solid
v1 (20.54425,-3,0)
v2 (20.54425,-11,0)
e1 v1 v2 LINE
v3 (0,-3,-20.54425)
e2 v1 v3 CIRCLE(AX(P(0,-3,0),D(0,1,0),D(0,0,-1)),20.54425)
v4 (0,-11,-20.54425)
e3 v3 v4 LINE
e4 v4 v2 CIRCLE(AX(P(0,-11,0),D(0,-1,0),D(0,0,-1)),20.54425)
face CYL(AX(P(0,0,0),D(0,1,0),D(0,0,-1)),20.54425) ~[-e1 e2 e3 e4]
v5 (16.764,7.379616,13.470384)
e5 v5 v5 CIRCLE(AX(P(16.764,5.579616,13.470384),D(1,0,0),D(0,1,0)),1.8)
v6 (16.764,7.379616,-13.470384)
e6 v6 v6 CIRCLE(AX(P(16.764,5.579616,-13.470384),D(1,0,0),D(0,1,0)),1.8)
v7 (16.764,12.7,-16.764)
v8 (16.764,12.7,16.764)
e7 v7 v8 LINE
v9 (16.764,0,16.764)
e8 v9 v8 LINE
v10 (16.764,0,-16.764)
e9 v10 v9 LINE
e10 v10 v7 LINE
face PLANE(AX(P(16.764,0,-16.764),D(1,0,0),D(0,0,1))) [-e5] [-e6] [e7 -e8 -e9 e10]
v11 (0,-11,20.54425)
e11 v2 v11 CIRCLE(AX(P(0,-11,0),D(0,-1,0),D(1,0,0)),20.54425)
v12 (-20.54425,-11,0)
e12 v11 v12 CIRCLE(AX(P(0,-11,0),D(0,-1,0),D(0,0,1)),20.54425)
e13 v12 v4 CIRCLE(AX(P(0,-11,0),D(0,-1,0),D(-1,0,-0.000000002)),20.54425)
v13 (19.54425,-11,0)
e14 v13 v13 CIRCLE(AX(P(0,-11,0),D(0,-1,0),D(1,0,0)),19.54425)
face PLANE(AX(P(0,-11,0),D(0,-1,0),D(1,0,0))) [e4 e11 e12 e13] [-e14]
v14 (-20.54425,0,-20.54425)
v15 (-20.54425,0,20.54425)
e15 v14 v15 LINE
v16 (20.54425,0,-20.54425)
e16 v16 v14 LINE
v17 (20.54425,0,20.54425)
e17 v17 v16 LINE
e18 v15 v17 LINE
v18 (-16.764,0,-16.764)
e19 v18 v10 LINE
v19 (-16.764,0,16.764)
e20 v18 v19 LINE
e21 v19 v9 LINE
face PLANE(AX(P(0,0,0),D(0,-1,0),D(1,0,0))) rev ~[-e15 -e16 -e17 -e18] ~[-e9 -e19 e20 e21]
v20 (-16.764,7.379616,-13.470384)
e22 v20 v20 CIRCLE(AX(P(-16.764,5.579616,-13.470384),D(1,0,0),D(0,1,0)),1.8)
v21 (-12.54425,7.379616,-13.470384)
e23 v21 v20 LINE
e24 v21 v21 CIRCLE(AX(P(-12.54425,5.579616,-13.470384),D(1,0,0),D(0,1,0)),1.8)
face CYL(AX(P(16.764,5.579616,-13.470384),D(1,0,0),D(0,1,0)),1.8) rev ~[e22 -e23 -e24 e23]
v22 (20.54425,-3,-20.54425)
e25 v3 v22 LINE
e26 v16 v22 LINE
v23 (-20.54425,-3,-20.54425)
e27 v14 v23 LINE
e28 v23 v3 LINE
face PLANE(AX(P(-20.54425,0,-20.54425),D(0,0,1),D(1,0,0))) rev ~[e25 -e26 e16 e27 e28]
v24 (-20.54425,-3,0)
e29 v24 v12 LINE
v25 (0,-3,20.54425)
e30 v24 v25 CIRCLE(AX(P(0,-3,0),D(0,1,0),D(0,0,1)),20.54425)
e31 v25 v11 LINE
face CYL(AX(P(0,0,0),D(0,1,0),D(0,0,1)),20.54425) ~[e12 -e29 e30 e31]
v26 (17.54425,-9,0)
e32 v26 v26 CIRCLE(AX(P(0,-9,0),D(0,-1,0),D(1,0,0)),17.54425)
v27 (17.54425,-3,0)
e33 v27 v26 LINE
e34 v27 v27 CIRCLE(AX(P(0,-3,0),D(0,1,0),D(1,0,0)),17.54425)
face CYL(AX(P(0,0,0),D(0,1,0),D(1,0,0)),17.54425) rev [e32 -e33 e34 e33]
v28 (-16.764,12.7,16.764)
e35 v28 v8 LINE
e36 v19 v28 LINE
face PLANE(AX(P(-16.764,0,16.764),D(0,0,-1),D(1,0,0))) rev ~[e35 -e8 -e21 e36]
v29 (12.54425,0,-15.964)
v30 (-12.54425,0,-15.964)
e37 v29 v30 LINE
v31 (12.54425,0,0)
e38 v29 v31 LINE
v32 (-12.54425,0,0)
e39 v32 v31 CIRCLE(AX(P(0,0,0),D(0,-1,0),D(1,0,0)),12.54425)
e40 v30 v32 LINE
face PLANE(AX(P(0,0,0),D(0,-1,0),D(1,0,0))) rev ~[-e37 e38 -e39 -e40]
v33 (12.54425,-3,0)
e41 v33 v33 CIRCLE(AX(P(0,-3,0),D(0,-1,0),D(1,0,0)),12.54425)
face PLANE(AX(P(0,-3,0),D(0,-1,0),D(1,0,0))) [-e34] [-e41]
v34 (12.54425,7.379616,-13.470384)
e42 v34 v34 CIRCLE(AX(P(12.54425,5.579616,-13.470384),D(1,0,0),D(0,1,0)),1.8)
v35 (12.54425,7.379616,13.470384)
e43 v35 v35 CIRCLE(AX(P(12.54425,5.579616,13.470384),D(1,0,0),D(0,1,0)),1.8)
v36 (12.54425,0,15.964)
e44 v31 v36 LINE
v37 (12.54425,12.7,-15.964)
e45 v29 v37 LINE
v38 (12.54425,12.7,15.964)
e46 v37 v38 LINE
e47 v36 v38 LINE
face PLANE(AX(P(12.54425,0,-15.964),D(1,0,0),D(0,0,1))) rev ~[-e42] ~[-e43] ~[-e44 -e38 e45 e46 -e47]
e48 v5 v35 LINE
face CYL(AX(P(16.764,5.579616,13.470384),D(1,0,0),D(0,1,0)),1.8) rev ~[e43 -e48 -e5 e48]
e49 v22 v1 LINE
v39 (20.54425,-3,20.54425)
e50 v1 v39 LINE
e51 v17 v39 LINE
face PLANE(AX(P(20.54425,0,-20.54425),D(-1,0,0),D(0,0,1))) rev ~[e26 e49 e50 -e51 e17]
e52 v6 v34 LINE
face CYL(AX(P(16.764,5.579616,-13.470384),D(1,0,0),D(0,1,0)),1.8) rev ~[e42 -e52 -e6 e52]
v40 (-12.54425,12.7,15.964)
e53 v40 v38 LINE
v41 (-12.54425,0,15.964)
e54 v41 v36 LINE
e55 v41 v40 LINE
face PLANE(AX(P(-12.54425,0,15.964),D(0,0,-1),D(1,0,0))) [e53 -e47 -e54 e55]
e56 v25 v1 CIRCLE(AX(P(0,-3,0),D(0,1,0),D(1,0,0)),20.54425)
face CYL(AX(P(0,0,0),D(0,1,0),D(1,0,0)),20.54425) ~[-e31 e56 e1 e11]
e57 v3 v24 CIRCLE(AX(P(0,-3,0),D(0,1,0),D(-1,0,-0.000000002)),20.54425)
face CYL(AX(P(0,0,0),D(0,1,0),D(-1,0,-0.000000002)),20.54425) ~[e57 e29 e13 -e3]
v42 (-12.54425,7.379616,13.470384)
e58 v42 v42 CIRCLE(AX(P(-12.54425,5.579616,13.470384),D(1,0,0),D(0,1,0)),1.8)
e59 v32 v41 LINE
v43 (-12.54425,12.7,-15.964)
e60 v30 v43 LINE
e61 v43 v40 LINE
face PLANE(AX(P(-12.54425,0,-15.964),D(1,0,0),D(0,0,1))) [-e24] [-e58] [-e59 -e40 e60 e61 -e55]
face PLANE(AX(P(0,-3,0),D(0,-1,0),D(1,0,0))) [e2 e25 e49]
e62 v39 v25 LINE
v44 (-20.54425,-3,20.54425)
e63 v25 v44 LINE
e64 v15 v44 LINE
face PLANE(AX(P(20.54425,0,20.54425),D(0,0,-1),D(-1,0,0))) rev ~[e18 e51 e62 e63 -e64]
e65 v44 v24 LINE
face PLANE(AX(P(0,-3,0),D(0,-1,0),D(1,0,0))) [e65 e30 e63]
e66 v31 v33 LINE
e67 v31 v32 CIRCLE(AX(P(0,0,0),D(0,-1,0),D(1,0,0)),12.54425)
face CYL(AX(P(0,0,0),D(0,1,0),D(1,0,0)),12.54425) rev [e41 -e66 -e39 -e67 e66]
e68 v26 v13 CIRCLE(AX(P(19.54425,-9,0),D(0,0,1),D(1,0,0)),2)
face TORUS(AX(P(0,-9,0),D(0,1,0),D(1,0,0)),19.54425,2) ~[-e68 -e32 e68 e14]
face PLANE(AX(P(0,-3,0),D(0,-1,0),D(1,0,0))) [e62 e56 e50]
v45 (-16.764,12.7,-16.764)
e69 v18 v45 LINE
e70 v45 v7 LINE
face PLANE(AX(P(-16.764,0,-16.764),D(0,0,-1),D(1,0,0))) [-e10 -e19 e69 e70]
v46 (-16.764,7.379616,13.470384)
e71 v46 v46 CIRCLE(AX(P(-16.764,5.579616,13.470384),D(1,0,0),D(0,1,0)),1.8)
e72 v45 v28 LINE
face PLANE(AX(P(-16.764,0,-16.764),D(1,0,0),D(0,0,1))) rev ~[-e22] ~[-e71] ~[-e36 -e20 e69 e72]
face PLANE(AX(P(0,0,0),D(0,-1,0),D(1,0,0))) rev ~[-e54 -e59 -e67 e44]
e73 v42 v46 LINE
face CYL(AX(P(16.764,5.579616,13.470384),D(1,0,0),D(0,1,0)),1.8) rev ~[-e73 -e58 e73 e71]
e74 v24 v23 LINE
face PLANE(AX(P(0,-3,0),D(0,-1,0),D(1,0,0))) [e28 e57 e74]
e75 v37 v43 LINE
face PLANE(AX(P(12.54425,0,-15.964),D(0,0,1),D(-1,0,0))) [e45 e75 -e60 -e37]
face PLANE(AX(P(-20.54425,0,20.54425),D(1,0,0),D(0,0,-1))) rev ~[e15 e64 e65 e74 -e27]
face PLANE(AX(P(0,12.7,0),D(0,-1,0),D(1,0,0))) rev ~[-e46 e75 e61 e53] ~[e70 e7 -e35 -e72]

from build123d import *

# Parameters (mm, degrees)
F0_R     = 17.54425
F1_DEPTH = 3
F0_R_2   = 12.54425
F2_DEPTH = 3
F3_DEPTH = 11
F4_R     = 2
F5_W     = 33.528
F5_H     = 33.528
F5_W_2   = 3.41975
F5_H_2   = 31.928
F6_DEPTH = 12.7
F7_R     = 1.8
F8_DEPTH = 37.30925


with BuildPart() as f1:
    # F0 (on Front) → F1 (new body)
    with BuildSketch(Plane.XZ):
        with BuildLine():
            ThreePointArc((20.54425, 0), (14.5269784894, 14.5269784894), (0, 20.54425))
            ThreePointArc((0, 20.54425), (-14.5269785029, 14.5269784759), (-20.54425, -3.82e-08))
            ThreePointArc((-20.54425, -3.82e-08), (-14.5269784759, -14.5269785029), (0, -20.54425))
            ThreePointArc((0, -20.54425), (14.5269784894, -14.5269784894), (20.54425, 0))
        make_face()
        Circle(F0_R, mode=Mode.SUBTRACT)
        with BuildLine():
            Line((20.54425, 20.54425), (0, 20.54425))
            ThreePointArc((0, 20.54425), (14.5269784894, 14.5269784894), (20.54425, 0))
            Line((20.54425, 0), (20.54425, 20.54425))
        make_face()
        with BuildLine():
            Line((20.54425, -20.54425), (20.54425, 0))
            ThreePointArc((20.54425, 0), (14.5269784894, -14.5269784894), (0, -20.54425))
            Line((0, -20.54425), (20.54425, -20.54425))
        make_face()
        with BuildLine():
            Line((0, 20.54425), (-20.54425, 20.54425))
            Line((-20.54425, 20.54425), (-20.54425, -3.82e-08))
            ThreePointArc((-20.54425, -3.82e-08), (-14.5269785029, 14.5269784759), (0, 20.54425))
        make_face()
        with BuildLine():
            ThreePointArc((0, -20.54425), (-14.5269784759, -14.5269785029), (-20.54425, -3.82e-08))
            Line((-20.54425, -3.82e-08), (-20.54425, -20.54425))
            Line((-20.54425, -20.54425), (0, -20.54425))
        make_face()
    extrude(amount=F1_DEPTH)

    # F0 (on Front) → F2 (join)
    with BuildSketch(Plane.XZ):
        Circle(F0_R)
        Circle(F0_R_2, mode=Mode.SUBTRACT)
    extrude(amount=F2_DEPTH)

    # F0 (on Front) → F3 (join)
    with BuildSketch(Plane.XZ):
        with BuildLine():
            ThreePointArc((20.54425, 0), (14.5269784894, 14.5269784894), (0, 20.54425))
            ThreePointArc((0, 20.54425), (-14.5269785029, 14.5269784759), (-20.54425, -3.82e-08))
            ThreePointArc((-20.54425, -3.82e-08), (-14.5269784759, -14.5269785029), (0, -20.54425))
            ThreePointArc((0, -20.54425), (14.5269784894, -14.5269784894), (20.54425, 0))
        make_face()
        Circle(F0_R, mode=Mode.SUBTRACT)
    extrude(amount=F3_DEPTH)

    # F4
    f4_edges = [f1.edges().sort_by_distance(p)[0] for p in [
        (-17.54425, -11, 0),
    ]]
    fillet(f4_edges, radius=F4_R)

    # F5 (on Front) → F6 (join)
    with BuildSketch(Plane.XZ):
        Rectangle(F5_W, F5_H)
        Polygon((12.54425, 15.964), (15.964, 15.964), (15.964, -15.964), (12.54425, -15.964), (-12.54425, -15.964), (-15.964, -15.964), (-15.964, 15.964), (-12.54425, 15.964), align=None, mode=Mode.SUBTRACT)
        with Locations((14.254125, 0)):
            Rectangle(F5_W_2, F5_H_2)
        with Locations((-14.254125, 0)):
            Rectangle(F5_W_2, F5_H_2)
    extrude(amount=-F6_DEPTH)

    # F7 (on face) → F8 (cut, through all)
    with BuildSketch(Plane.YZ.offset(16.764)):
        with Locations((5.5796158184, 13.4703841816)):
            Circle(F7_R)
        with Locations((5.5796158184, -13.4703841816)):
            Circle(F7_R)
    extrude(amount=-F8_DEPTH, mode=Mode.SUBTRACT)


solid = f1.part
